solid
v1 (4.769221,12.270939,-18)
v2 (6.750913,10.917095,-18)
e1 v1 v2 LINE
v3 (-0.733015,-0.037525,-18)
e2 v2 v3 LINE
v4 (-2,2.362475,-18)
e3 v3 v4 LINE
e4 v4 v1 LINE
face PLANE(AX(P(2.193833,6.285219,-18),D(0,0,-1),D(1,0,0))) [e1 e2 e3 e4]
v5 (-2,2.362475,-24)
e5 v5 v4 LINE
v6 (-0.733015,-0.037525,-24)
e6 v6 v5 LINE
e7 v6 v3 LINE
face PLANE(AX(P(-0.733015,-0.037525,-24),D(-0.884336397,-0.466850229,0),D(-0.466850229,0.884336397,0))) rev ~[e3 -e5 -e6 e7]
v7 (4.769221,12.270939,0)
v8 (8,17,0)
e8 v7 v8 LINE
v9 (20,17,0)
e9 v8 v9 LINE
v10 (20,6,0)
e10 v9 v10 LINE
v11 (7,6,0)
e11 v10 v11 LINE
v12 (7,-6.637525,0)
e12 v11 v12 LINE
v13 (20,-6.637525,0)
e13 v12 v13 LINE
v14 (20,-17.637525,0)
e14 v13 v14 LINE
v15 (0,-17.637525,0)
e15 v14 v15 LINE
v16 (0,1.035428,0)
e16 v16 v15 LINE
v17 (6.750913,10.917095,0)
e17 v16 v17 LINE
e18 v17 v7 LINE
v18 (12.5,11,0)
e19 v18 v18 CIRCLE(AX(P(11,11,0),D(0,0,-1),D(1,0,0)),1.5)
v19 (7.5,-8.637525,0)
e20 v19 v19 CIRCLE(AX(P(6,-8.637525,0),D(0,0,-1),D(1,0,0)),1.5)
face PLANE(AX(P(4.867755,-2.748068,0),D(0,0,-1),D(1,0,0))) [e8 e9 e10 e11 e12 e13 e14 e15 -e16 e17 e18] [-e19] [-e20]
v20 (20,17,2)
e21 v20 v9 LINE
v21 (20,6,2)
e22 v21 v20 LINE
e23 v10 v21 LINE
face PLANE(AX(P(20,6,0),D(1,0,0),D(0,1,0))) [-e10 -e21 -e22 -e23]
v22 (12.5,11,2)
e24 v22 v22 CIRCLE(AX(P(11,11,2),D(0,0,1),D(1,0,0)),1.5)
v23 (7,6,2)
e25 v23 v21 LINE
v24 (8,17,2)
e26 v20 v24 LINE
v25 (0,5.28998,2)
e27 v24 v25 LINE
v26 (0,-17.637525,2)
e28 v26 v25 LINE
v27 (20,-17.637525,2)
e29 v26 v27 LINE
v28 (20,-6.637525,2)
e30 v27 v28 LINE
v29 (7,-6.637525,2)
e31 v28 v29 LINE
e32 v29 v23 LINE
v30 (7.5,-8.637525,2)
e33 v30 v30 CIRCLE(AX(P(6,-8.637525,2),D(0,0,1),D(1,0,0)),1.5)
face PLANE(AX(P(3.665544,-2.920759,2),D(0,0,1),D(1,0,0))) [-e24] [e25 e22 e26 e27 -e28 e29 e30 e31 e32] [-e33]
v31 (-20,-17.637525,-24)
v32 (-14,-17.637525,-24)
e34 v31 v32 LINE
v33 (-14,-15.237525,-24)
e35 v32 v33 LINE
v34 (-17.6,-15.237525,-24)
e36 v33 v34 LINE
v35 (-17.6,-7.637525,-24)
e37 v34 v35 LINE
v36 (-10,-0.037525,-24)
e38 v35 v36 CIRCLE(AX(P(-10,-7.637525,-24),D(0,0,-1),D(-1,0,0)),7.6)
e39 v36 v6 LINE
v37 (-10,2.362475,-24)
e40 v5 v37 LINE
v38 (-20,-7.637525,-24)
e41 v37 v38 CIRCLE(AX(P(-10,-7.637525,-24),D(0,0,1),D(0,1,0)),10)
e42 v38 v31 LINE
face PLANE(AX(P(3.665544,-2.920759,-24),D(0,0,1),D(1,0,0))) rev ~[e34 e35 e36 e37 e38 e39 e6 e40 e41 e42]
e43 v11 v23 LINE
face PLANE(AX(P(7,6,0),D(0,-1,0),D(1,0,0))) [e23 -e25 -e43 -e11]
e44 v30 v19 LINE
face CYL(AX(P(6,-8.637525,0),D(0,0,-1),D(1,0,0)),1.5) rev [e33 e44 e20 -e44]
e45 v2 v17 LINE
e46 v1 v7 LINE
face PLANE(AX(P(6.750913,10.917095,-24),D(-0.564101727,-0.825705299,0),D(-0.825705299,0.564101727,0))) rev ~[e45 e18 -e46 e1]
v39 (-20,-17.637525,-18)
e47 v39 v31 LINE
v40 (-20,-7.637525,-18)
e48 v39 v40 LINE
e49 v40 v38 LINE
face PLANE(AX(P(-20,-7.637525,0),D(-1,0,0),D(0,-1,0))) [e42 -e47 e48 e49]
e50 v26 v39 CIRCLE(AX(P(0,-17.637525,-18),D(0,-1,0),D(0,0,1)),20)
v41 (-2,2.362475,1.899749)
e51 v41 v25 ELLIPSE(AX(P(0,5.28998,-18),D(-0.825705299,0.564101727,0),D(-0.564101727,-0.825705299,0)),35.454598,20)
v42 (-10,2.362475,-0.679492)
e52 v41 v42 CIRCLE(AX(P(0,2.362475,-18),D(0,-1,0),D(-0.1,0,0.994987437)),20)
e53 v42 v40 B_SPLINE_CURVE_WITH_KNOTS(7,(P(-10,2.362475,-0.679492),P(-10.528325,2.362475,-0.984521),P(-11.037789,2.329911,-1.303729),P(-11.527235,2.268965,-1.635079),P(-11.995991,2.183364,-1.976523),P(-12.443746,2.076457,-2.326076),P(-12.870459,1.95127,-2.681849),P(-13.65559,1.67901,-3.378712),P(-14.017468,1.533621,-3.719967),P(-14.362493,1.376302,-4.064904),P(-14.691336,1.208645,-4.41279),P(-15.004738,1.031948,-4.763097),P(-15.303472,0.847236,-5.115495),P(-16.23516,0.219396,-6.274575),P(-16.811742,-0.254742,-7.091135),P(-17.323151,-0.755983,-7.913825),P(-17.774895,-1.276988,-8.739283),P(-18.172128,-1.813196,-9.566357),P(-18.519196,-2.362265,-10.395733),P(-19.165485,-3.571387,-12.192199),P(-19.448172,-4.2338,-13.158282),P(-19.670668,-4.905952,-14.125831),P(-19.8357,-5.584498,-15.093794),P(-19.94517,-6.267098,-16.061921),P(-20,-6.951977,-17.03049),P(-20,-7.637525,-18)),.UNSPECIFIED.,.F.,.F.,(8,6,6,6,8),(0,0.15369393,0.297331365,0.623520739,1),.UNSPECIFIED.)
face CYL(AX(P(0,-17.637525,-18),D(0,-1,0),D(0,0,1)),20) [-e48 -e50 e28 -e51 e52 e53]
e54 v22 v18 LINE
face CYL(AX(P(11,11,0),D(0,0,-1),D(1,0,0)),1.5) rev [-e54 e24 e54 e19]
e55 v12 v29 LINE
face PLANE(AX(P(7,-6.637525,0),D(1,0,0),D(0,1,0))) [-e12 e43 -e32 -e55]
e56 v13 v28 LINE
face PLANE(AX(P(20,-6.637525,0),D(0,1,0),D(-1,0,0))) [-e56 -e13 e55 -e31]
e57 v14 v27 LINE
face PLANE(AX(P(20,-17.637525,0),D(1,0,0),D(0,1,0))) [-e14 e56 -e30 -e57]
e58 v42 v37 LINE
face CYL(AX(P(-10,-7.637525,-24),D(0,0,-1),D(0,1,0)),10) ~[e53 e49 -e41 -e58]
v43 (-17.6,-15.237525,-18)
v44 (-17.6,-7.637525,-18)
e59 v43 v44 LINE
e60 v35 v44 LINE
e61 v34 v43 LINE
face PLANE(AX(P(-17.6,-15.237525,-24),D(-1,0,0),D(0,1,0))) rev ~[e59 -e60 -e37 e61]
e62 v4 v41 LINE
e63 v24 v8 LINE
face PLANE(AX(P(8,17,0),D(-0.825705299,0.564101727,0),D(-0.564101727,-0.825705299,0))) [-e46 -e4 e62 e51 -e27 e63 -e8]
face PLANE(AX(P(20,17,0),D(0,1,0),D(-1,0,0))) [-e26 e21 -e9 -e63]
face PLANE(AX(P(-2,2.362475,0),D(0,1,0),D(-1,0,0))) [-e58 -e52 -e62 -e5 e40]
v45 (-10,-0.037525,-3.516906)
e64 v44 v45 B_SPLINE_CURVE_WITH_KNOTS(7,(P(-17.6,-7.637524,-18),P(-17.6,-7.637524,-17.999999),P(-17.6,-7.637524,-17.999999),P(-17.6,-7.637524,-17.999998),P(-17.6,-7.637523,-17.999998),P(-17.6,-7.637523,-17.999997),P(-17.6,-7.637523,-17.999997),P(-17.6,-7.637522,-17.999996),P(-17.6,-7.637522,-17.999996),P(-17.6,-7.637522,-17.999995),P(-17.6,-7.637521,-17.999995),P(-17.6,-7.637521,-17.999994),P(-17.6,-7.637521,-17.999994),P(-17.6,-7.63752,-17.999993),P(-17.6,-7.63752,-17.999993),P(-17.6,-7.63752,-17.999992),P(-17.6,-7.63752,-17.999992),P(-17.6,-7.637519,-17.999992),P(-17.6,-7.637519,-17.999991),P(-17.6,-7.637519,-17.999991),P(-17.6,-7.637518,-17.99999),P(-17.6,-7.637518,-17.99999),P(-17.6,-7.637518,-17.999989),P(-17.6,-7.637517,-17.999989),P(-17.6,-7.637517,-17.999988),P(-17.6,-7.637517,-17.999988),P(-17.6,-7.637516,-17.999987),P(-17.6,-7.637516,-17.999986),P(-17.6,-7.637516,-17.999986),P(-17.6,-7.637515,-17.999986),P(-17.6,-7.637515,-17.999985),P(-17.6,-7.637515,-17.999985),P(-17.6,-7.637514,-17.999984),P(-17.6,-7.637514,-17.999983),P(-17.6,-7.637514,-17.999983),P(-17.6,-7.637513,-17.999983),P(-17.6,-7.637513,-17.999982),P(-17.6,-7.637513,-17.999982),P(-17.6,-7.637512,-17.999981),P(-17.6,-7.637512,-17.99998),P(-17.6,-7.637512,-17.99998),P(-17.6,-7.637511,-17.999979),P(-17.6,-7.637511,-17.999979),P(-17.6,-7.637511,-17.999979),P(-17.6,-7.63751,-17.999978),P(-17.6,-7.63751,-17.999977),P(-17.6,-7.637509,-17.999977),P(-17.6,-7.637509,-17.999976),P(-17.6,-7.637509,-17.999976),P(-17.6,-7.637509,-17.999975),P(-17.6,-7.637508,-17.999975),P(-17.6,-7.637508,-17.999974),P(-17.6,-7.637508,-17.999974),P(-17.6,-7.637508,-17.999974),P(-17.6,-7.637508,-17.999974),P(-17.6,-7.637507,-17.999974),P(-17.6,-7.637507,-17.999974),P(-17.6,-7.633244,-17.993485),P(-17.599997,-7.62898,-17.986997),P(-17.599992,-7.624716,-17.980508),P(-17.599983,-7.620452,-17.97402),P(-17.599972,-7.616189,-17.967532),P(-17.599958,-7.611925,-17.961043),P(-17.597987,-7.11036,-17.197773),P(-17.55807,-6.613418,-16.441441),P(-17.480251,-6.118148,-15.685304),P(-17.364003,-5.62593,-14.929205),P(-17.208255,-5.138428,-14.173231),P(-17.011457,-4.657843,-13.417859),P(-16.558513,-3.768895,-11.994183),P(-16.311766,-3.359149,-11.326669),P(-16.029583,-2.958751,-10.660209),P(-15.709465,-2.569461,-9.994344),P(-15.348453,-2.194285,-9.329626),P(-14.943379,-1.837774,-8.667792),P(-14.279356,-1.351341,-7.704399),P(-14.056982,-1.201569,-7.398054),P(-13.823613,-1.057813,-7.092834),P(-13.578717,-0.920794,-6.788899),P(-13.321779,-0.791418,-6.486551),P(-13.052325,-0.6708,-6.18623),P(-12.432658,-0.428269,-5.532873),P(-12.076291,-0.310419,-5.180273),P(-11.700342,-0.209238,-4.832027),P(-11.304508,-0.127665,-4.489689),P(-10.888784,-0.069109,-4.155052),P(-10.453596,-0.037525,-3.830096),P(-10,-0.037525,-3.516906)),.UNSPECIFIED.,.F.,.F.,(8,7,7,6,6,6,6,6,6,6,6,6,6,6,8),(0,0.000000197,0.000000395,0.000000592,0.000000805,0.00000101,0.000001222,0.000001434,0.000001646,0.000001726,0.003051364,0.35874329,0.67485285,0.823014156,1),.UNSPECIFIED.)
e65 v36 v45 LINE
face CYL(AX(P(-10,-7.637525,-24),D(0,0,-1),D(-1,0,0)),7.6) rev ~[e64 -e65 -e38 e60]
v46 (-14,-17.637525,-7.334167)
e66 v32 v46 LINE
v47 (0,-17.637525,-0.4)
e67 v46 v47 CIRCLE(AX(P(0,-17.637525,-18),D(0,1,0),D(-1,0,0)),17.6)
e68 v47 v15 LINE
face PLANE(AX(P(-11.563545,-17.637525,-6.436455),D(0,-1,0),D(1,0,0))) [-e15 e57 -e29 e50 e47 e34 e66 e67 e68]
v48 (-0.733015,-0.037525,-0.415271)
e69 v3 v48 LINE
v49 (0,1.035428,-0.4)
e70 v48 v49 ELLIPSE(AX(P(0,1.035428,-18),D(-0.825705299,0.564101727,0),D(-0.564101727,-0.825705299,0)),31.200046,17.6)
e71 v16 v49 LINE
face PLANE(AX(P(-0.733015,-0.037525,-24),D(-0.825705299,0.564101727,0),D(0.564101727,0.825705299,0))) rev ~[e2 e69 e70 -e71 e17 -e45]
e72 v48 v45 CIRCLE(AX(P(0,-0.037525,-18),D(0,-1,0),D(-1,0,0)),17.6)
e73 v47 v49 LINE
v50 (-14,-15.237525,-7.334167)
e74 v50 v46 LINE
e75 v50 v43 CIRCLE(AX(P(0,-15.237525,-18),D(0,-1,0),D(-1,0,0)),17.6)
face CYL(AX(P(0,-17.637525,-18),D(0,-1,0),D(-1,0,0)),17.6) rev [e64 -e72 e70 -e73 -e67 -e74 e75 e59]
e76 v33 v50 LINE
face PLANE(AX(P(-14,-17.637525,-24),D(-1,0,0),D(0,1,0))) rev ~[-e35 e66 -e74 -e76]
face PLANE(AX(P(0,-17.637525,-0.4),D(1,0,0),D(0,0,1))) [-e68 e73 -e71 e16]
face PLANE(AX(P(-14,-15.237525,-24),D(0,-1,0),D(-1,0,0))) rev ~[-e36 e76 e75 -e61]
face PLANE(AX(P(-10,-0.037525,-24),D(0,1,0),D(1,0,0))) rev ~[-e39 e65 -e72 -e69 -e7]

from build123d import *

# Parameters (mm, degrees)
F0_R      = 1.5
F1_DEPTH  = 2
F2_DEPTH  = 24
F4_DEPTH  = 25
F5_R      = 1.5
F6_DEPTH  = 24
F8_DEPTH  = 20
F10_DEPTH = 25
F11_DEPTH = 6


# Not quite as in the source:
# - a feature names something its author has since deleted; it is built from what else it names


with BuildPart() as f1:
    # F0 (on Top) → F1 (new body)
    with BuildSketch(Plane.XY):
        with BuildLine():
            Line((-20, -17.6375247538), (20, -17.6375247538))
            Line((20, -17.6375247538), (20, -6.6375247538))
            Line((20, -6.6375247538), (7, -6.6375247538))
            Line((7, -6.6375247538), (7, 6))
            Line((7, 6), (20, 6))
            Line((20, 6), (20, 17))
            Line((20, 17), (8, 17))
            Line((8, 17), (-2, 2.3624752462))
            Line((-2, 2.3624752462), (-10, 2.3624752462))
            ThreePointArc((-10, 2.3624752462), (-17.0710678119, -0.5664569419), (-20, -7.6375247538))
            Line((-20, -7.6375247538), (-20, -17.6375247538))
        make_face()
        with Locations((6, -8.6375247538)):
            Circle(F0_R, mode=Mode.SUBTRACT)
        with Locations((11, 11)):
            Circle(F0_R, mode=Mode.SUBTRACT)
    extrude(amount=F1_DEPTH)

    # F2 (add): a face of the model
    f2_faces = [f1.faces().sort_by_distance(p)[0] for p in [
        (0.9940051369, -4.5309976768, 0),
    ]]
    extrude(f2_faces, amount=F2_DEPTH)

    # F3 (on face) → F4 (cut)
    with BuildSketch(Plane.XZ.offset(17.6375247538)):
        with BuildLine():
            Line((-20, -11), (-20, -18))
            ThreePointArc((-20, -18), (-14.1421356237, -3.8578643763), (0, 2))
            Line((0, 2), (-7, 2))
            Line((-7, 2), (-20, 2))
            Line((-20, 2), (-20, -11))
        make_face()
    extrude(amount=-F4_DEPTH, mode=Mode.SUBTRACT)

    # F5 (on face) → F6 (cut)
    with BuildSketch(Plane(origin=(0, 0, -24), x_dir=(1, 0, 0), z_dir=(0, 0, -1))):
        with BuildLine():
            Line((20, 17.6375247538), (-14, 17.6375247538))
            Line((-14, 17.6375247538), (-14, 15.2375247538))
            Line((-14, 15.2375247538), (-17.6, 15.2375247538))
            Line((-17.6, 15.2375247538), (-17.6, 7.6375247538))
            ThreePointArc((-17.6, 7.6375247538), (-15.374011537, 2.2635132168), (-10, 0.0375247538))
            Line((-10, 0.0375247538), (-0.7330154527, 0.0375247538))
            Line((-0.7330154527, 0.0375247538), (6.7509134438, -10.9170946941))
            Line((6.7509134438, -10.9170946941), (4.7692207252, -12.2709388392))
            Line((4.7692207252, -12.2709388392), (8, -17))
            Line((8, -17), (20, -17))
            Line((20, -17), (20, -6))
            Line((20, -6), (7, -6))
            Line((7, -6), (7, 6.6375247538))
            Line((7, 6.6375247538), (20, 6.6375247538))
            Line((20, 6.6375247538), (20, 17.6375247538))
        make_face()
        with Locations((11, -11)):
            Circle(F5_R, mode=Mode.SUBTRACT)
        with Locations((6, 8.6375247538)):
            Circle(F5_R, mode=Mode.SUBTRACT)
    extrude(amount=-F6_DEPTH, mode=Mode.SUBTRACT)

    # F7 (on face) → F8 (join)
    with BuildSketch(Plane.XZ.offset(17.6375247538)):
        with BuildLine():
            Line((0, -0.4), (0, 2))
            ThreePointArc((0, 2), (-14.1421356237, -3.8578643763), (-20, -18))
            Line((-20, -18), (-17.6, -18))
            ThreePointArc((-17.6, -18), (-12.4450793489, -5.5549206511), (0, -0.4))
        make_face()
    extrude(amount=-F8_DEPTH)

    # F9 (on face) → F10 (cut)
    with BuildSketch(Plane(origin=(0, 0, -24), x_dir=(1, 0, 0), z_dir=(0, 0, -1))):
        with BuildLine():
            ThreePointArc((-25, 7.6375247538), (-20.6066017178, -2.969076964), (-10, -7.3624752462))
            Line((-10, -7.3624752462), (-10, -2.3624752462))
            ThreePointArc((-10, -2.3624752462), (-17.0710678119, 0.5664569419), (-20, 7.6375247538))
            Line((-20, 7.6375247538), (-25, 7.6375247538))
        make_face()
    extrude(amount=-F10_DEPTH, mode=Mode.SUBTRACT)

    # F5 (on face) → F11 (cut)
    with BuildSketch(Plane(origin=(0, 0, -24), x_dir=(1, 0, 0), z_dir=(0, 0, -1))):
        Polygon((-0.7330154527, 0.0375247538), (-2, -2.3624752462), (4.7692207252, -12.2709388392), (6.7509134438, -10.9170946941), align=None)
    extrude(amount=-F11_DEPTH, mode=Mode.SUBTRACT)


solid = f1.part
